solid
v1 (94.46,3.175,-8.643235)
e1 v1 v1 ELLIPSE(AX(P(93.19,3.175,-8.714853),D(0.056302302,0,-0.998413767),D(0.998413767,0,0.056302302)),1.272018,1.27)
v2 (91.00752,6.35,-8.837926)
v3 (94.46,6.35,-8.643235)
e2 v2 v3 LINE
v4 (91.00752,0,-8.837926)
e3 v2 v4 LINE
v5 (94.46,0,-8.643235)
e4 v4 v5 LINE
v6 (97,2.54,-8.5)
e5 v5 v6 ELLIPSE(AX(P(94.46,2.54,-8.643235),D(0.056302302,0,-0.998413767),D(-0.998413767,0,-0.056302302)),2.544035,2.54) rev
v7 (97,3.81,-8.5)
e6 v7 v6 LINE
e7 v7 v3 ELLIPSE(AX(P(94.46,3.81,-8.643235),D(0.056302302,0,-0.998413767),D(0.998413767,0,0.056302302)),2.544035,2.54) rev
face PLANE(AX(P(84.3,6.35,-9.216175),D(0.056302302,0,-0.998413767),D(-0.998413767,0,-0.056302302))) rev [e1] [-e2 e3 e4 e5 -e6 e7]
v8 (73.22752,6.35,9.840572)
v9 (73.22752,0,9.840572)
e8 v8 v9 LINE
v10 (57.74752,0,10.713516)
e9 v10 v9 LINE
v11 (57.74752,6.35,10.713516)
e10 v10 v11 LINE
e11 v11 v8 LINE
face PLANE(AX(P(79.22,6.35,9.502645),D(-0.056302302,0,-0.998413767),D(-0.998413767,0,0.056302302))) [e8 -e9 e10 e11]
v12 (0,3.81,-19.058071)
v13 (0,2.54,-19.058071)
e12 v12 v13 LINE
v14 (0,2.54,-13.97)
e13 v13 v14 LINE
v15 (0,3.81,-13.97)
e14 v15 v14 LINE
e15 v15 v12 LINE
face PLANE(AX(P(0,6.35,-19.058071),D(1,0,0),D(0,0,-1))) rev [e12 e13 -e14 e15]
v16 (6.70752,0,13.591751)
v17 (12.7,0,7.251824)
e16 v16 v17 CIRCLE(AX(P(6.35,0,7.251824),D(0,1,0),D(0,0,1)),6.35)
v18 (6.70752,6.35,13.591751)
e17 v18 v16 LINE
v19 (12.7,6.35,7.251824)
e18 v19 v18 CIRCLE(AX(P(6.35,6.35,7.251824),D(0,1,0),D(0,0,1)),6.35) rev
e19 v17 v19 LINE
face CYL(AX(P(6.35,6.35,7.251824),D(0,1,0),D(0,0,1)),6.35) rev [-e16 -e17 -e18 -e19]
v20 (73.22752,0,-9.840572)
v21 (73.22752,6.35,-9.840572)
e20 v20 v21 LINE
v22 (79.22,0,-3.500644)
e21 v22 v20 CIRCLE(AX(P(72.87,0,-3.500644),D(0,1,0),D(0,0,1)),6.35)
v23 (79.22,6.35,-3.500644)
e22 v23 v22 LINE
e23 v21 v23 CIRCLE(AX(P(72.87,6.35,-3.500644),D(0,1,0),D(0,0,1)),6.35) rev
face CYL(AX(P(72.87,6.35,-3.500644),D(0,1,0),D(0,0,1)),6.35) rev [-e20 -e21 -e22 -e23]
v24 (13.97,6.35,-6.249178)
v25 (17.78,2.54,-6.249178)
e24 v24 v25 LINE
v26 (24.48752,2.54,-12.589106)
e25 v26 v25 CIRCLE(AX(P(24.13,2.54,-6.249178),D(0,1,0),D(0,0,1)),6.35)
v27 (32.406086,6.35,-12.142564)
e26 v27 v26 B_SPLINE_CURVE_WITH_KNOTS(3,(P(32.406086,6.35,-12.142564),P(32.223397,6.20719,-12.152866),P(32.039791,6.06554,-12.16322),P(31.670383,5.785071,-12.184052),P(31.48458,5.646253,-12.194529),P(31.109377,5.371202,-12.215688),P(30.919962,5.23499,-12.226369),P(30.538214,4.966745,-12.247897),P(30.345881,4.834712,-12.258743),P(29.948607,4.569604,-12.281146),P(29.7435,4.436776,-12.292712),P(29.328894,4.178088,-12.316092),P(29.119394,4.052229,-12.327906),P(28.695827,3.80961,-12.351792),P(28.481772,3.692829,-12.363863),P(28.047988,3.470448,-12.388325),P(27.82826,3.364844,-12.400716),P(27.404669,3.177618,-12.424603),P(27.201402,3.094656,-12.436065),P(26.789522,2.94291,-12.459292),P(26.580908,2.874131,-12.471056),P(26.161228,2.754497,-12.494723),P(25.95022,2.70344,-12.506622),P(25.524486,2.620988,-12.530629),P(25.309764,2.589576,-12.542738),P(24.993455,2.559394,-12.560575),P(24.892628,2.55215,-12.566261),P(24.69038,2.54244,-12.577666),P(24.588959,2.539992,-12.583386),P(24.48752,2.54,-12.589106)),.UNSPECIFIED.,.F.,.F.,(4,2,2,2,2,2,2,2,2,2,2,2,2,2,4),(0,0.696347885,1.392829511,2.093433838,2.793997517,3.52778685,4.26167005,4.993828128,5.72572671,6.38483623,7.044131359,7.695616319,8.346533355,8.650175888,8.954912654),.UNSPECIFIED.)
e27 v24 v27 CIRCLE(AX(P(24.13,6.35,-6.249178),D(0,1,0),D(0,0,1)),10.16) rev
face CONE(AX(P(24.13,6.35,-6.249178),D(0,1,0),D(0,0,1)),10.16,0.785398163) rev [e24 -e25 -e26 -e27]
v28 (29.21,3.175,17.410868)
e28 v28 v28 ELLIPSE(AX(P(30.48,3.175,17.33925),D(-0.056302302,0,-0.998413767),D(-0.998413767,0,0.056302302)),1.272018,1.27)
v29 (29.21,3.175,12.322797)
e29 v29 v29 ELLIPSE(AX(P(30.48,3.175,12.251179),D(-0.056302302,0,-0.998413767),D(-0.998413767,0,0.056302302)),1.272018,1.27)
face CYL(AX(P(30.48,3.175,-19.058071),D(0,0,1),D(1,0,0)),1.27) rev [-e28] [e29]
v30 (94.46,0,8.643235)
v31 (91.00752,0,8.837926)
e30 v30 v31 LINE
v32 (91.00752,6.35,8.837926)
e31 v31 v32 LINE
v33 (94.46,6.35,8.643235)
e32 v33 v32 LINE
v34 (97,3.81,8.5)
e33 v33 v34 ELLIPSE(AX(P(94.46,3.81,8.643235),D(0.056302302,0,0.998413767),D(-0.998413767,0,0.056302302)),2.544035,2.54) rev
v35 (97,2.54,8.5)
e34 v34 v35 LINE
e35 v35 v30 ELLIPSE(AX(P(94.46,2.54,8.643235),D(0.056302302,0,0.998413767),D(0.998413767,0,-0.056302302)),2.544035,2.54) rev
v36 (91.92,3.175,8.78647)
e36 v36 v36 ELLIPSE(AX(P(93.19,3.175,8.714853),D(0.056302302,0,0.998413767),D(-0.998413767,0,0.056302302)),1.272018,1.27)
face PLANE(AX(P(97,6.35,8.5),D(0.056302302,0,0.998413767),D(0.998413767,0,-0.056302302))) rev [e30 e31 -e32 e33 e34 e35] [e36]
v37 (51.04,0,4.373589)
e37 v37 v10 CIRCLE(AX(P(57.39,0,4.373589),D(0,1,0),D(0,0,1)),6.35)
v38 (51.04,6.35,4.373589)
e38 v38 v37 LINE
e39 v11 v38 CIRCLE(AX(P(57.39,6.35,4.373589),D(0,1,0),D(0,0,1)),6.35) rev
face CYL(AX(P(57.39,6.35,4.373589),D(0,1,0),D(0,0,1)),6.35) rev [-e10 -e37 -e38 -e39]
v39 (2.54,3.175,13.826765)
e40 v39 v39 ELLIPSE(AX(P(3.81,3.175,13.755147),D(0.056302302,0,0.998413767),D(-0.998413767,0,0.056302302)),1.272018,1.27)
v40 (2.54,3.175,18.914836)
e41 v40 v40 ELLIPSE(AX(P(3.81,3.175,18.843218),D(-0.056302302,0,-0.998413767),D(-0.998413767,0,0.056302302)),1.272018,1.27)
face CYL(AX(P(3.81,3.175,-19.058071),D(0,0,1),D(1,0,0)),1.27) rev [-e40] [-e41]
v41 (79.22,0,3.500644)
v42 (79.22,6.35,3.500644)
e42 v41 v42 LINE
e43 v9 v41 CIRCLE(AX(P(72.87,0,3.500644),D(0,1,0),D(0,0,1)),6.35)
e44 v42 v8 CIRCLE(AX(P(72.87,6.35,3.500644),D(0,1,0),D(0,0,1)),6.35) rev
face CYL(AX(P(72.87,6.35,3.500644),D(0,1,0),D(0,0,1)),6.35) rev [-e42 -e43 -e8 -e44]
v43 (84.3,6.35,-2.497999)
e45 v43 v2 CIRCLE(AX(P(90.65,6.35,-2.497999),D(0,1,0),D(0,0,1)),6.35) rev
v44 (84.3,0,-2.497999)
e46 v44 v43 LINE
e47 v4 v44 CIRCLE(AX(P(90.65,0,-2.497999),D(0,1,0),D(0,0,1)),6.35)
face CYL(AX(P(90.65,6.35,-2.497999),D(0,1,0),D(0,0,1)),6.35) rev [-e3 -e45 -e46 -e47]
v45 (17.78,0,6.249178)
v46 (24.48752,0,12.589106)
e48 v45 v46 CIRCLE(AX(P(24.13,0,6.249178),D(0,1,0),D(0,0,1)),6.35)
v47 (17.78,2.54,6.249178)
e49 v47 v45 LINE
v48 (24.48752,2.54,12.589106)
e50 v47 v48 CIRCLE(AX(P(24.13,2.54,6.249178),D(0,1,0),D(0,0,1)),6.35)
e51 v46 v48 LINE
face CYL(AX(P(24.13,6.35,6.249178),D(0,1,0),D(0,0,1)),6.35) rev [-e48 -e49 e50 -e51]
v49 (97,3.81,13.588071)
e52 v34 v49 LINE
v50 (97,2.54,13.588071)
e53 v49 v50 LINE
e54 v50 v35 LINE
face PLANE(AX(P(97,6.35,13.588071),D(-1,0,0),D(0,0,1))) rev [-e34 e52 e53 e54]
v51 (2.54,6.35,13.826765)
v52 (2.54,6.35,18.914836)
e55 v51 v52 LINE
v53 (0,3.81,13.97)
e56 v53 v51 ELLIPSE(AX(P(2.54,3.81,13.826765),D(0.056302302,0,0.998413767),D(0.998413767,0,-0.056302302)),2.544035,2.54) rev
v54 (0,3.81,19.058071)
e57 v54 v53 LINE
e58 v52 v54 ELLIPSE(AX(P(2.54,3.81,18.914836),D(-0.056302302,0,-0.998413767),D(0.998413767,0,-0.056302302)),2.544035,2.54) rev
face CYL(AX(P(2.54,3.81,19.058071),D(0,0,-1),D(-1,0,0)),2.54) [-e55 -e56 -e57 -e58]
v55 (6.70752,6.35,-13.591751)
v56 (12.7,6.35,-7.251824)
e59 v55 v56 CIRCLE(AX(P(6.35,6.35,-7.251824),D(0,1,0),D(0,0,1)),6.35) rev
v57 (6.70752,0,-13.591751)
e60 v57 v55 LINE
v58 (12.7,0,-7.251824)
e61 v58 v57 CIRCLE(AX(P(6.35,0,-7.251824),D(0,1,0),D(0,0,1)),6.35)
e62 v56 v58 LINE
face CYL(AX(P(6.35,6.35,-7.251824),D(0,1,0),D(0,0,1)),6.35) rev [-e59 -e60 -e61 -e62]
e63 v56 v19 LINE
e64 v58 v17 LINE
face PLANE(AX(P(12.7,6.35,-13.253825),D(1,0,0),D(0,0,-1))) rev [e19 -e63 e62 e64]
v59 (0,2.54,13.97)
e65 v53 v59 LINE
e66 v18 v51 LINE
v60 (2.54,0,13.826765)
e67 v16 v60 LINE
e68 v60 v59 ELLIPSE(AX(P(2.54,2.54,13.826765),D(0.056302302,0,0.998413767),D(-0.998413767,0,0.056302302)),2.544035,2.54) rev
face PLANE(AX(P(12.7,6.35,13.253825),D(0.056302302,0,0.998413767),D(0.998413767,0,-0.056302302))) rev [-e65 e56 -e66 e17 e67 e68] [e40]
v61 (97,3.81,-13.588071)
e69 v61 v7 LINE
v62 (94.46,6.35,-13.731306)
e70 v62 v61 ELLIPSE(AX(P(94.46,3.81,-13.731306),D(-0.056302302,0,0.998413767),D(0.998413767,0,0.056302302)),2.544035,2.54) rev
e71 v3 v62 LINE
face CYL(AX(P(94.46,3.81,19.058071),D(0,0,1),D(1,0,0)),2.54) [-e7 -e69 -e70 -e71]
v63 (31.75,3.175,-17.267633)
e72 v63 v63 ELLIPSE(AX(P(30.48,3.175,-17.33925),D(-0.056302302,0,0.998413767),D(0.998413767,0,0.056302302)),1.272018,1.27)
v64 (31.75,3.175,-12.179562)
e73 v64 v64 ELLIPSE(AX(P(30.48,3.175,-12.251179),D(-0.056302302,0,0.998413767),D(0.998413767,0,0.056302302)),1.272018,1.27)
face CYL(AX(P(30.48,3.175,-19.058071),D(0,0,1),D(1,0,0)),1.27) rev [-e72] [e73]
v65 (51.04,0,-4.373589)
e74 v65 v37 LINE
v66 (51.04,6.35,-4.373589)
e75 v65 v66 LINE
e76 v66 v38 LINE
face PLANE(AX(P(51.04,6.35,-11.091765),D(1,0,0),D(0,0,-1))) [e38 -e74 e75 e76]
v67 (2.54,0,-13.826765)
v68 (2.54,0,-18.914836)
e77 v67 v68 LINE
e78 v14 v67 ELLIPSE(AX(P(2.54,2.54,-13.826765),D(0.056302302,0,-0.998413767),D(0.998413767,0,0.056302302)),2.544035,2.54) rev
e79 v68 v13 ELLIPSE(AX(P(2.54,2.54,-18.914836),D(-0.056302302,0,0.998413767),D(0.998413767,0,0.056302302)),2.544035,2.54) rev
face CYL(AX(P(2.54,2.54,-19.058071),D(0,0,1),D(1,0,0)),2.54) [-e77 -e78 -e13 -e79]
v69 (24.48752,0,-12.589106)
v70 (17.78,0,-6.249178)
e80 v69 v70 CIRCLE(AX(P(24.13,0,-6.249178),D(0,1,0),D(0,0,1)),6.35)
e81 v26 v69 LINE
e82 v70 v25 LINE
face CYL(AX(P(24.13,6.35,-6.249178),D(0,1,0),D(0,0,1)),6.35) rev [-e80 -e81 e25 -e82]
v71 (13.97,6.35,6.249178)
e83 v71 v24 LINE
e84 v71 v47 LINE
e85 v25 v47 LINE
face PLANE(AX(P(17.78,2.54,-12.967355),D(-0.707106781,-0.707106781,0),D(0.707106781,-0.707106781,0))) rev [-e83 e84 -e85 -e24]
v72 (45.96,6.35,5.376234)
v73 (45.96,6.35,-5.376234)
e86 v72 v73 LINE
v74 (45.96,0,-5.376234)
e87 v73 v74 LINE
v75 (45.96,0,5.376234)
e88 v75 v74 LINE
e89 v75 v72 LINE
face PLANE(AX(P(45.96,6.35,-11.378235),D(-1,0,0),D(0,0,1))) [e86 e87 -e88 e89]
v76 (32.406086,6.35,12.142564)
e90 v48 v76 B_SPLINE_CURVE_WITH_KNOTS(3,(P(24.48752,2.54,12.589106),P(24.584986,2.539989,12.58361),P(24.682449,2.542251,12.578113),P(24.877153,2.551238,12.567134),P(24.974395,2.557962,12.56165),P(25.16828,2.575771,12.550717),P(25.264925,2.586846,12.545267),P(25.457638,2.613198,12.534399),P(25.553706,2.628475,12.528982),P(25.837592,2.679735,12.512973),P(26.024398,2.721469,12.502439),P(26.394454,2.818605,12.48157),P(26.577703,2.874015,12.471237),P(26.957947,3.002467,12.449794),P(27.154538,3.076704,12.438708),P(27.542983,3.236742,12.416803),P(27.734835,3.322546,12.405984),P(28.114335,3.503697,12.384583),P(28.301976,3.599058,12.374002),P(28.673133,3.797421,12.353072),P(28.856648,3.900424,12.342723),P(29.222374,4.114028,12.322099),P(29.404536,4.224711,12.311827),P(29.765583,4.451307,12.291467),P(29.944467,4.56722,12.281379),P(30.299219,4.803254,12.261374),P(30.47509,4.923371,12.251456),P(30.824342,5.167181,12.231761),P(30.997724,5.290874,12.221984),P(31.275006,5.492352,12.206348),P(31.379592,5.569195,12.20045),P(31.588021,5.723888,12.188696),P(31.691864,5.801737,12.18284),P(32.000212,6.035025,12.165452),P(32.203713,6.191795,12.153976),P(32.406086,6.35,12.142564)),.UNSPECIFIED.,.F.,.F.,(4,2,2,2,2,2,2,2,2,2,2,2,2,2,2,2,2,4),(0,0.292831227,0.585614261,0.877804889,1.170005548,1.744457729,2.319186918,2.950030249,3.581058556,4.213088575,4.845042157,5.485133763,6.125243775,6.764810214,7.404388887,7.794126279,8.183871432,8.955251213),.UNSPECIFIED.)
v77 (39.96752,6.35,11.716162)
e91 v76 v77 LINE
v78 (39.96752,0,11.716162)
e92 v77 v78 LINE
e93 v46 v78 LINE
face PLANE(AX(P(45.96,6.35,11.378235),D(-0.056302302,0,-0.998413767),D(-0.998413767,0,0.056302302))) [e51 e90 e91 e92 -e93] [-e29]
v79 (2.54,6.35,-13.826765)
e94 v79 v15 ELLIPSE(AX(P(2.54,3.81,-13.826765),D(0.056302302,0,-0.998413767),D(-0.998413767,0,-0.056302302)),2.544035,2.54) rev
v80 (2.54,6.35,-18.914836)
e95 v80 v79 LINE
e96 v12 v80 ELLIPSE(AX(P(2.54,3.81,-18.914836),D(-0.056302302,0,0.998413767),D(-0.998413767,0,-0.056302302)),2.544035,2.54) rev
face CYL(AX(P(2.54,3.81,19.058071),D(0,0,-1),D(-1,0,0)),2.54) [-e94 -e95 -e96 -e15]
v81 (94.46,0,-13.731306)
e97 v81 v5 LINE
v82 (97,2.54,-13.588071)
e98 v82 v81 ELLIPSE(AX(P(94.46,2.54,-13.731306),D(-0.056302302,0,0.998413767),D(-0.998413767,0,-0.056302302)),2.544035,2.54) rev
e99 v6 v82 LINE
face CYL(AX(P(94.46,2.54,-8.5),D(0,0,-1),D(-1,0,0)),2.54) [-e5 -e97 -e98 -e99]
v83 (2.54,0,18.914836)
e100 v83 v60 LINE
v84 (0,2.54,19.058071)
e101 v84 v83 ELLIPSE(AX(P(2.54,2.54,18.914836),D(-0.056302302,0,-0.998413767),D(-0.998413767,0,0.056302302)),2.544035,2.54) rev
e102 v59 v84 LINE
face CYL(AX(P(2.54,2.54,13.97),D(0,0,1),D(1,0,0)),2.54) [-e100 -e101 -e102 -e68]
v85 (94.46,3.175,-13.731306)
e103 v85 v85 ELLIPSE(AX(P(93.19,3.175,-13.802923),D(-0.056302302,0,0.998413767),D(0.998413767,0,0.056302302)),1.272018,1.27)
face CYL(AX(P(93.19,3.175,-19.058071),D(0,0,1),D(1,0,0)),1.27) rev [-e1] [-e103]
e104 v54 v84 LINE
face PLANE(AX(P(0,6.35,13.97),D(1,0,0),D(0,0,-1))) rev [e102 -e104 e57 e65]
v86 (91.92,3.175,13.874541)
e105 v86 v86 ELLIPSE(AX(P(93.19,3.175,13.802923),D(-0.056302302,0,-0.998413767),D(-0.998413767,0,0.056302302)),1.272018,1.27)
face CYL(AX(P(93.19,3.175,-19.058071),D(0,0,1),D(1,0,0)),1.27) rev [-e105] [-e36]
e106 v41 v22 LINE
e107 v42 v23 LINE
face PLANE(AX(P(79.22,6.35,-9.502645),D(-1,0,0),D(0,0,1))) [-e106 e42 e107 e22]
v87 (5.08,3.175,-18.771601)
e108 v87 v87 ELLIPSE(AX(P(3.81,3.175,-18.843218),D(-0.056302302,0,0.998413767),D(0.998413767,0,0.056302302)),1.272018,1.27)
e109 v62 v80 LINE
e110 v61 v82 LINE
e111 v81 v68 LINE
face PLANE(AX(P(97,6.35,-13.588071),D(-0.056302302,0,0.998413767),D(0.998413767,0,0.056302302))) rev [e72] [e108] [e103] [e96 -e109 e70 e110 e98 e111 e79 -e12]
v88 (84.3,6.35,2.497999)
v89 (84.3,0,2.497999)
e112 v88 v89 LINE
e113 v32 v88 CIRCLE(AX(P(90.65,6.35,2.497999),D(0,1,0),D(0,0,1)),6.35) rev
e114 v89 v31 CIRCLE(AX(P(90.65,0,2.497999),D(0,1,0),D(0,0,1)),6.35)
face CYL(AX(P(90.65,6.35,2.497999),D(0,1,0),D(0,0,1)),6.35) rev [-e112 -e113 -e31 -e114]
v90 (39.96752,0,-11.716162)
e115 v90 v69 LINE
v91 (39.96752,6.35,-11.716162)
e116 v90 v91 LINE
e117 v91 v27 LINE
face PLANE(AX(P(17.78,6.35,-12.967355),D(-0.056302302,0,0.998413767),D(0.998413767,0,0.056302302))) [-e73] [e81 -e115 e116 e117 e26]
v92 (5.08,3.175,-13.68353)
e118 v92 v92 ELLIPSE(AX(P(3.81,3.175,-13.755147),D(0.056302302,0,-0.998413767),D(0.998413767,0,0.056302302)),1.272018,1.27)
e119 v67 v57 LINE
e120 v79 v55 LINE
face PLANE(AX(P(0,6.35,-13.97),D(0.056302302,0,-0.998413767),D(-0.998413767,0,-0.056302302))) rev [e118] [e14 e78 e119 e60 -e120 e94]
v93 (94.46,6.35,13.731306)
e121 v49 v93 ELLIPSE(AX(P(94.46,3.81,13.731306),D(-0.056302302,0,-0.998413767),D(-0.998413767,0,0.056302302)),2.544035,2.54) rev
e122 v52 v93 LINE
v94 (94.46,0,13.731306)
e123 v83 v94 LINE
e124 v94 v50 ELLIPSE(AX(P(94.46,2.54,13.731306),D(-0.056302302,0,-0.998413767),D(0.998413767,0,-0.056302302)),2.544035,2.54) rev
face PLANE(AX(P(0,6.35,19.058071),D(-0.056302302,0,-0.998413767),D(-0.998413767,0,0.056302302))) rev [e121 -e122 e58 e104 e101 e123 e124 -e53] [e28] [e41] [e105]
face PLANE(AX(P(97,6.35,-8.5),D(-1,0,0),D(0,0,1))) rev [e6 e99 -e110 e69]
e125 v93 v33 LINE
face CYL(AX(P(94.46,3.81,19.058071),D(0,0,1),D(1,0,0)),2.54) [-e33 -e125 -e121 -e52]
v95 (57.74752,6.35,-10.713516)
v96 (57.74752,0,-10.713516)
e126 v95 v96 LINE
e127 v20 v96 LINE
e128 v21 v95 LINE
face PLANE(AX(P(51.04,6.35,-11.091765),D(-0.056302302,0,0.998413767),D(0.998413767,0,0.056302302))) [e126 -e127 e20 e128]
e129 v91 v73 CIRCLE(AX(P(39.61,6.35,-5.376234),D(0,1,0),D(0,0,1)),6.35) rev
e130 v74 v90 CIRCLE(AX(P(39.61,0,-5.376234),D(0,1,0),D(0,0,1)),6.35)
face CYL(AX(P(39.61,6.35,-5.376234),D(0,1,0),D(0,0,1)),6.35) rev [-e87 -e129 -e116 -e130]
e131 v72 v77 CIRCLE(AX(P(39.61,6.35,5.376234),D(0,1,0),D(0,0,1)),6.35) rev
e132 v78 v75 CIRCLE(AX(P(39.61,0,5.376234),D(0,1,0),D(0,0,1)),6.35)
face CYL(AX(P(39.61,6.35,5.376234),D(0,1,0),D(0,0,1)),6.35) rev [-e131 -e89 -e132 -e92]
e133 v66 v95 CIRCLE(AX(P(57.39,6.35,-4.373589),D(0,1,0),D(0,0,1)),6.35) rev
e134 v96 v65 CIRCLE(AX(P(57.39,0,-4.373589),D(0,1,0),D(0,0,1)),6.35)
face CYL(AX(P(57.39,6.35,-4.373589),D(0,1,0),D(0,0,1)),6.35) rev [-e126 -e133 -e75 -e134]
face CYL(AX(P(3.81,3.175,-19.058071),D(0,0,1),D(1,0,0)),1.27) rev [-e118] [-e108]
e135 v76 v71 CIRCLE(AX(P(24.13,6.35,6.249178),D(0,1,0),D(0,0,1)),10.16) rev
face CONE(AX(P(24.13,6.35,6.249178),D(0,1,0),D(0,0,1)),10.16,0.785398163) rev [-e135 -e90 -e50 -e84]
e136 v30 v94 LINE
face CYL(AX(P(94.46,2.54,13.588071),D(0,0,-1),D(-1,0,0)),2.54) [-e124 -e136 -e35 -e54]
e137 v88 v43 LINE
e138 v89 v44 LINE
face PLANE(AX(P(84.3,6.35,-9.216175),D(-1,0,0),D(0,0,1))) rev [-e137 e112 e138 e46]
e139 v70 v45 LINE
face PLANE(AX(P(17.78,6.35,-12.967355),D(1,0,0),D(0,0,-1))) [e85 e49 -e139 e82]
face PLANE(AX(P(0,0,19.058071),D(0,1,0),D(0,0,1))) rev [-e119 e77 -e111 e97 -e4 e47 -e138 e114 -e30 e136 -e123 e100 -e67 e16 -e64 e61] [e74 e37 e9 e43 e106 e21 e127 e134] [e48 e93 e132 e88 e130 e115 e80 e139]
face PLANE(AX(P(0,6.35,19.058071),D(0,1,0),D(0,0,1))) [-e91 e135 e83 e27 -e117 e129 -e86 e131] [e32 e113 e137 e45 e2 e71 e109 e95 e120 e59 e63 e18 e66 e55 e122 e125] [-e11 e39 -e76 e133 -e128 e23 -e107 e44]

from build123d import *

# Parameters (mm, degrees)
ARM_DEPTH               = 6.35
CUT_EXTRUDE1_DEPTH      = 100.058228154
CUT_EXTRUDE1_DEPTH_BACK = 100.058228154
SKETCH2_R               = 1.27
CUT_EXTRUDE2_DEPTH      = 100.058228154
CUT_EXTRUDE2_DEPTH_BACK = 100.058228154
SKETCH3_R               = 1.27
FILLET2_R               = 6.35
FILLET3_R               = 2.54
CHAMFER1_SIZE           = 3.81


with BuildPart() as part:
    # Sketch1 → Arm (new body)
    with BuildSketch(Plane(origin=(0, 0, 0), x_dir=(1, 0, 0), z_dir=(0, 1, 0))):
        Polygon((0, -19.058070864), (97, -13.588070864), (97, -8.5), (84.3, -9.216175258), (84.3, 9.216175258), (97, 8.5), (97, 13.588070864), (0, 19.058070864), (0, 13.97), (12.7, 13.253824742), (12.7, -13.253824742), (0, -13.97), align=None)
        Polygon((79.22, -9.502645361), (51.04, -11.091764948), (51.04, 11.091764948), (79.22, 9.502645361), align=None, mode=Mode.SUBTRACT)
        Polygon((17.78, 12.967354639), (17.78, -12.967354639), (45.96, -11.378235052), (45.96, 11.378235052), align=None, mode=Mode.SUBTRACT)
    extrude(amount=ARM_DEPTH)

    # Sketch2 → Cut-Extrude1 (cut, two sides: drawn at the far end of the back side and taken through both)
    with BuildSketch(Plane.XY.offset(-CUT_EXTRUDE1_DEPTH_BACK)):
        with Locations(Location((30.48, 3.175, 0), (0, 0, 180))):
            Circle(SKETCH2_R)
    extrude(amount=CUT_EXTRUDE1_DEPTH + CUT_EXTRUDE1_DEPTH_BACK, mode=Mode.SUBTRACT)

    # Sketch3 → Cut-Extrude2 (cut, two sides: drawn at the far end of the back side and taken through both)
    with BuildSketch(Plane.XY.offset(-CUT_EXTRUDE2_DEPTH_BACK)):
        with Locations((93.19, 3.175)):
            Circle(SKETCH3_R)
        with Locations(Location((3.81, 3.175, 0), (0, 0, 180))):
            Circle(SKETCH3_R)
    extrude(amount=CUT_EXTRUDE2_DEPTH + CUT_EXTRUDE2_DEPTH_BACK, mode=Mode.SUBTRACT)

    # Fillet2
    fillet2_edges = [part.edges().sort_by_distance(p)[0] for p in [
        (12.7, 3.175, 13.253824742),
        (12.7, 3.175, -13.253824742),
        (84.3, 3.175, -9.216175258),
        (84.3, 3.175, 9.216175258),
        (45.96, 3.175, -11.378235052),
        (17.78, 3.175, -12.967354639),
        (17.78, 3.175, 12.967354639),
        (45.96, 3.175, 11.378235052),
        (79.22, 3.175, 9.502645361),
        (79.22, 3.175, -9.502645361),
        (51.04, 3.175, -11.091764948),
        (51.04, 3.175, 11.091764948),
    ]]
    fillet(fillet2_edges, radius=FILLET2_R)

    # Fillet3
    fillet3_edges = [part.edges().sort_by_distance(p)[0] for p in [
        (97, 6.35, 11.044035432),
        (0, 0, -16.514035432),
        (97, 0, -11.044035432),
        (97, 0, 11.044035432),
        (0, 0, 16.514035432),
        (97, 6.35, -11.044035432),
        (0, 6.35, -16.514035432),
        (0, 6.35, 16.514035432),
    ]]
    fillet(fillet3_edges, radius=FILLET3_R)

    # Chamfer1
    # the kernel refuses this chamfer: 3.81 mm, written as the material it takes off along each edge
    with BuildSketch(Plane(origin=(17.78, 6.35, -6.24917843), x_dir=(0.027495876610586382, -0.9996219169112968, 0), z_dir=(0, 0, 1))) as chamfer1_piece_1:
        Polygon((CHAMFER1_SIZE * 0.999621916911, -CHAMFER1_SIZE * 0.0274958766106), (-CHAMFER1_SIZE * 0.0274958766106, -CHAMFER1_SIZE * 0.999621916911), (0, 0), align=None)
    extrude(amount=12.49835686, mode=Mode.SUBTRACT)
    with BuildSketch(Plane(origin=(24.13, 6.35, 6.24917843), x_dir=(0.9995733988743083, 0, -0.02920651062456478), z_dir=(-0.02920651062456478, 0, -0.9995733988743083))) as chamfer1_piece_2:
        Polygon((6.35, CHAMFER1_SIZE), (6.35 + CHAMFER1_SIZE, 0), (6.35, 0), align=None)
    revolve(axis=Axis((24.13, 6.35, 6.24917843), (0, -1, 0)), revolution_arc=181.673647793, mode=Mode.SUBTRACT)
    with BuildSketch(Plane(origin=(24.13, 6.35, -6.24917843), x_dir=(0.9995733988743084, 0, 0.029206510624563663), z_dir=(-0.029206510624563663, 0, 0.9995733988743084))) as chamfer1_piece_3:
        Polygon((6.35, -CHAMFER1_SIZE), (6.35 + CHAMFER1_SIZE, 0), (6.35, 0), align=None)
    revolve(axis=Axis((24.13, 6.35, -6.24917843), (0, 1, 0)), revolution_arc=181.673647793, mode=Mode.SUBTRACT)


solid = part.part
